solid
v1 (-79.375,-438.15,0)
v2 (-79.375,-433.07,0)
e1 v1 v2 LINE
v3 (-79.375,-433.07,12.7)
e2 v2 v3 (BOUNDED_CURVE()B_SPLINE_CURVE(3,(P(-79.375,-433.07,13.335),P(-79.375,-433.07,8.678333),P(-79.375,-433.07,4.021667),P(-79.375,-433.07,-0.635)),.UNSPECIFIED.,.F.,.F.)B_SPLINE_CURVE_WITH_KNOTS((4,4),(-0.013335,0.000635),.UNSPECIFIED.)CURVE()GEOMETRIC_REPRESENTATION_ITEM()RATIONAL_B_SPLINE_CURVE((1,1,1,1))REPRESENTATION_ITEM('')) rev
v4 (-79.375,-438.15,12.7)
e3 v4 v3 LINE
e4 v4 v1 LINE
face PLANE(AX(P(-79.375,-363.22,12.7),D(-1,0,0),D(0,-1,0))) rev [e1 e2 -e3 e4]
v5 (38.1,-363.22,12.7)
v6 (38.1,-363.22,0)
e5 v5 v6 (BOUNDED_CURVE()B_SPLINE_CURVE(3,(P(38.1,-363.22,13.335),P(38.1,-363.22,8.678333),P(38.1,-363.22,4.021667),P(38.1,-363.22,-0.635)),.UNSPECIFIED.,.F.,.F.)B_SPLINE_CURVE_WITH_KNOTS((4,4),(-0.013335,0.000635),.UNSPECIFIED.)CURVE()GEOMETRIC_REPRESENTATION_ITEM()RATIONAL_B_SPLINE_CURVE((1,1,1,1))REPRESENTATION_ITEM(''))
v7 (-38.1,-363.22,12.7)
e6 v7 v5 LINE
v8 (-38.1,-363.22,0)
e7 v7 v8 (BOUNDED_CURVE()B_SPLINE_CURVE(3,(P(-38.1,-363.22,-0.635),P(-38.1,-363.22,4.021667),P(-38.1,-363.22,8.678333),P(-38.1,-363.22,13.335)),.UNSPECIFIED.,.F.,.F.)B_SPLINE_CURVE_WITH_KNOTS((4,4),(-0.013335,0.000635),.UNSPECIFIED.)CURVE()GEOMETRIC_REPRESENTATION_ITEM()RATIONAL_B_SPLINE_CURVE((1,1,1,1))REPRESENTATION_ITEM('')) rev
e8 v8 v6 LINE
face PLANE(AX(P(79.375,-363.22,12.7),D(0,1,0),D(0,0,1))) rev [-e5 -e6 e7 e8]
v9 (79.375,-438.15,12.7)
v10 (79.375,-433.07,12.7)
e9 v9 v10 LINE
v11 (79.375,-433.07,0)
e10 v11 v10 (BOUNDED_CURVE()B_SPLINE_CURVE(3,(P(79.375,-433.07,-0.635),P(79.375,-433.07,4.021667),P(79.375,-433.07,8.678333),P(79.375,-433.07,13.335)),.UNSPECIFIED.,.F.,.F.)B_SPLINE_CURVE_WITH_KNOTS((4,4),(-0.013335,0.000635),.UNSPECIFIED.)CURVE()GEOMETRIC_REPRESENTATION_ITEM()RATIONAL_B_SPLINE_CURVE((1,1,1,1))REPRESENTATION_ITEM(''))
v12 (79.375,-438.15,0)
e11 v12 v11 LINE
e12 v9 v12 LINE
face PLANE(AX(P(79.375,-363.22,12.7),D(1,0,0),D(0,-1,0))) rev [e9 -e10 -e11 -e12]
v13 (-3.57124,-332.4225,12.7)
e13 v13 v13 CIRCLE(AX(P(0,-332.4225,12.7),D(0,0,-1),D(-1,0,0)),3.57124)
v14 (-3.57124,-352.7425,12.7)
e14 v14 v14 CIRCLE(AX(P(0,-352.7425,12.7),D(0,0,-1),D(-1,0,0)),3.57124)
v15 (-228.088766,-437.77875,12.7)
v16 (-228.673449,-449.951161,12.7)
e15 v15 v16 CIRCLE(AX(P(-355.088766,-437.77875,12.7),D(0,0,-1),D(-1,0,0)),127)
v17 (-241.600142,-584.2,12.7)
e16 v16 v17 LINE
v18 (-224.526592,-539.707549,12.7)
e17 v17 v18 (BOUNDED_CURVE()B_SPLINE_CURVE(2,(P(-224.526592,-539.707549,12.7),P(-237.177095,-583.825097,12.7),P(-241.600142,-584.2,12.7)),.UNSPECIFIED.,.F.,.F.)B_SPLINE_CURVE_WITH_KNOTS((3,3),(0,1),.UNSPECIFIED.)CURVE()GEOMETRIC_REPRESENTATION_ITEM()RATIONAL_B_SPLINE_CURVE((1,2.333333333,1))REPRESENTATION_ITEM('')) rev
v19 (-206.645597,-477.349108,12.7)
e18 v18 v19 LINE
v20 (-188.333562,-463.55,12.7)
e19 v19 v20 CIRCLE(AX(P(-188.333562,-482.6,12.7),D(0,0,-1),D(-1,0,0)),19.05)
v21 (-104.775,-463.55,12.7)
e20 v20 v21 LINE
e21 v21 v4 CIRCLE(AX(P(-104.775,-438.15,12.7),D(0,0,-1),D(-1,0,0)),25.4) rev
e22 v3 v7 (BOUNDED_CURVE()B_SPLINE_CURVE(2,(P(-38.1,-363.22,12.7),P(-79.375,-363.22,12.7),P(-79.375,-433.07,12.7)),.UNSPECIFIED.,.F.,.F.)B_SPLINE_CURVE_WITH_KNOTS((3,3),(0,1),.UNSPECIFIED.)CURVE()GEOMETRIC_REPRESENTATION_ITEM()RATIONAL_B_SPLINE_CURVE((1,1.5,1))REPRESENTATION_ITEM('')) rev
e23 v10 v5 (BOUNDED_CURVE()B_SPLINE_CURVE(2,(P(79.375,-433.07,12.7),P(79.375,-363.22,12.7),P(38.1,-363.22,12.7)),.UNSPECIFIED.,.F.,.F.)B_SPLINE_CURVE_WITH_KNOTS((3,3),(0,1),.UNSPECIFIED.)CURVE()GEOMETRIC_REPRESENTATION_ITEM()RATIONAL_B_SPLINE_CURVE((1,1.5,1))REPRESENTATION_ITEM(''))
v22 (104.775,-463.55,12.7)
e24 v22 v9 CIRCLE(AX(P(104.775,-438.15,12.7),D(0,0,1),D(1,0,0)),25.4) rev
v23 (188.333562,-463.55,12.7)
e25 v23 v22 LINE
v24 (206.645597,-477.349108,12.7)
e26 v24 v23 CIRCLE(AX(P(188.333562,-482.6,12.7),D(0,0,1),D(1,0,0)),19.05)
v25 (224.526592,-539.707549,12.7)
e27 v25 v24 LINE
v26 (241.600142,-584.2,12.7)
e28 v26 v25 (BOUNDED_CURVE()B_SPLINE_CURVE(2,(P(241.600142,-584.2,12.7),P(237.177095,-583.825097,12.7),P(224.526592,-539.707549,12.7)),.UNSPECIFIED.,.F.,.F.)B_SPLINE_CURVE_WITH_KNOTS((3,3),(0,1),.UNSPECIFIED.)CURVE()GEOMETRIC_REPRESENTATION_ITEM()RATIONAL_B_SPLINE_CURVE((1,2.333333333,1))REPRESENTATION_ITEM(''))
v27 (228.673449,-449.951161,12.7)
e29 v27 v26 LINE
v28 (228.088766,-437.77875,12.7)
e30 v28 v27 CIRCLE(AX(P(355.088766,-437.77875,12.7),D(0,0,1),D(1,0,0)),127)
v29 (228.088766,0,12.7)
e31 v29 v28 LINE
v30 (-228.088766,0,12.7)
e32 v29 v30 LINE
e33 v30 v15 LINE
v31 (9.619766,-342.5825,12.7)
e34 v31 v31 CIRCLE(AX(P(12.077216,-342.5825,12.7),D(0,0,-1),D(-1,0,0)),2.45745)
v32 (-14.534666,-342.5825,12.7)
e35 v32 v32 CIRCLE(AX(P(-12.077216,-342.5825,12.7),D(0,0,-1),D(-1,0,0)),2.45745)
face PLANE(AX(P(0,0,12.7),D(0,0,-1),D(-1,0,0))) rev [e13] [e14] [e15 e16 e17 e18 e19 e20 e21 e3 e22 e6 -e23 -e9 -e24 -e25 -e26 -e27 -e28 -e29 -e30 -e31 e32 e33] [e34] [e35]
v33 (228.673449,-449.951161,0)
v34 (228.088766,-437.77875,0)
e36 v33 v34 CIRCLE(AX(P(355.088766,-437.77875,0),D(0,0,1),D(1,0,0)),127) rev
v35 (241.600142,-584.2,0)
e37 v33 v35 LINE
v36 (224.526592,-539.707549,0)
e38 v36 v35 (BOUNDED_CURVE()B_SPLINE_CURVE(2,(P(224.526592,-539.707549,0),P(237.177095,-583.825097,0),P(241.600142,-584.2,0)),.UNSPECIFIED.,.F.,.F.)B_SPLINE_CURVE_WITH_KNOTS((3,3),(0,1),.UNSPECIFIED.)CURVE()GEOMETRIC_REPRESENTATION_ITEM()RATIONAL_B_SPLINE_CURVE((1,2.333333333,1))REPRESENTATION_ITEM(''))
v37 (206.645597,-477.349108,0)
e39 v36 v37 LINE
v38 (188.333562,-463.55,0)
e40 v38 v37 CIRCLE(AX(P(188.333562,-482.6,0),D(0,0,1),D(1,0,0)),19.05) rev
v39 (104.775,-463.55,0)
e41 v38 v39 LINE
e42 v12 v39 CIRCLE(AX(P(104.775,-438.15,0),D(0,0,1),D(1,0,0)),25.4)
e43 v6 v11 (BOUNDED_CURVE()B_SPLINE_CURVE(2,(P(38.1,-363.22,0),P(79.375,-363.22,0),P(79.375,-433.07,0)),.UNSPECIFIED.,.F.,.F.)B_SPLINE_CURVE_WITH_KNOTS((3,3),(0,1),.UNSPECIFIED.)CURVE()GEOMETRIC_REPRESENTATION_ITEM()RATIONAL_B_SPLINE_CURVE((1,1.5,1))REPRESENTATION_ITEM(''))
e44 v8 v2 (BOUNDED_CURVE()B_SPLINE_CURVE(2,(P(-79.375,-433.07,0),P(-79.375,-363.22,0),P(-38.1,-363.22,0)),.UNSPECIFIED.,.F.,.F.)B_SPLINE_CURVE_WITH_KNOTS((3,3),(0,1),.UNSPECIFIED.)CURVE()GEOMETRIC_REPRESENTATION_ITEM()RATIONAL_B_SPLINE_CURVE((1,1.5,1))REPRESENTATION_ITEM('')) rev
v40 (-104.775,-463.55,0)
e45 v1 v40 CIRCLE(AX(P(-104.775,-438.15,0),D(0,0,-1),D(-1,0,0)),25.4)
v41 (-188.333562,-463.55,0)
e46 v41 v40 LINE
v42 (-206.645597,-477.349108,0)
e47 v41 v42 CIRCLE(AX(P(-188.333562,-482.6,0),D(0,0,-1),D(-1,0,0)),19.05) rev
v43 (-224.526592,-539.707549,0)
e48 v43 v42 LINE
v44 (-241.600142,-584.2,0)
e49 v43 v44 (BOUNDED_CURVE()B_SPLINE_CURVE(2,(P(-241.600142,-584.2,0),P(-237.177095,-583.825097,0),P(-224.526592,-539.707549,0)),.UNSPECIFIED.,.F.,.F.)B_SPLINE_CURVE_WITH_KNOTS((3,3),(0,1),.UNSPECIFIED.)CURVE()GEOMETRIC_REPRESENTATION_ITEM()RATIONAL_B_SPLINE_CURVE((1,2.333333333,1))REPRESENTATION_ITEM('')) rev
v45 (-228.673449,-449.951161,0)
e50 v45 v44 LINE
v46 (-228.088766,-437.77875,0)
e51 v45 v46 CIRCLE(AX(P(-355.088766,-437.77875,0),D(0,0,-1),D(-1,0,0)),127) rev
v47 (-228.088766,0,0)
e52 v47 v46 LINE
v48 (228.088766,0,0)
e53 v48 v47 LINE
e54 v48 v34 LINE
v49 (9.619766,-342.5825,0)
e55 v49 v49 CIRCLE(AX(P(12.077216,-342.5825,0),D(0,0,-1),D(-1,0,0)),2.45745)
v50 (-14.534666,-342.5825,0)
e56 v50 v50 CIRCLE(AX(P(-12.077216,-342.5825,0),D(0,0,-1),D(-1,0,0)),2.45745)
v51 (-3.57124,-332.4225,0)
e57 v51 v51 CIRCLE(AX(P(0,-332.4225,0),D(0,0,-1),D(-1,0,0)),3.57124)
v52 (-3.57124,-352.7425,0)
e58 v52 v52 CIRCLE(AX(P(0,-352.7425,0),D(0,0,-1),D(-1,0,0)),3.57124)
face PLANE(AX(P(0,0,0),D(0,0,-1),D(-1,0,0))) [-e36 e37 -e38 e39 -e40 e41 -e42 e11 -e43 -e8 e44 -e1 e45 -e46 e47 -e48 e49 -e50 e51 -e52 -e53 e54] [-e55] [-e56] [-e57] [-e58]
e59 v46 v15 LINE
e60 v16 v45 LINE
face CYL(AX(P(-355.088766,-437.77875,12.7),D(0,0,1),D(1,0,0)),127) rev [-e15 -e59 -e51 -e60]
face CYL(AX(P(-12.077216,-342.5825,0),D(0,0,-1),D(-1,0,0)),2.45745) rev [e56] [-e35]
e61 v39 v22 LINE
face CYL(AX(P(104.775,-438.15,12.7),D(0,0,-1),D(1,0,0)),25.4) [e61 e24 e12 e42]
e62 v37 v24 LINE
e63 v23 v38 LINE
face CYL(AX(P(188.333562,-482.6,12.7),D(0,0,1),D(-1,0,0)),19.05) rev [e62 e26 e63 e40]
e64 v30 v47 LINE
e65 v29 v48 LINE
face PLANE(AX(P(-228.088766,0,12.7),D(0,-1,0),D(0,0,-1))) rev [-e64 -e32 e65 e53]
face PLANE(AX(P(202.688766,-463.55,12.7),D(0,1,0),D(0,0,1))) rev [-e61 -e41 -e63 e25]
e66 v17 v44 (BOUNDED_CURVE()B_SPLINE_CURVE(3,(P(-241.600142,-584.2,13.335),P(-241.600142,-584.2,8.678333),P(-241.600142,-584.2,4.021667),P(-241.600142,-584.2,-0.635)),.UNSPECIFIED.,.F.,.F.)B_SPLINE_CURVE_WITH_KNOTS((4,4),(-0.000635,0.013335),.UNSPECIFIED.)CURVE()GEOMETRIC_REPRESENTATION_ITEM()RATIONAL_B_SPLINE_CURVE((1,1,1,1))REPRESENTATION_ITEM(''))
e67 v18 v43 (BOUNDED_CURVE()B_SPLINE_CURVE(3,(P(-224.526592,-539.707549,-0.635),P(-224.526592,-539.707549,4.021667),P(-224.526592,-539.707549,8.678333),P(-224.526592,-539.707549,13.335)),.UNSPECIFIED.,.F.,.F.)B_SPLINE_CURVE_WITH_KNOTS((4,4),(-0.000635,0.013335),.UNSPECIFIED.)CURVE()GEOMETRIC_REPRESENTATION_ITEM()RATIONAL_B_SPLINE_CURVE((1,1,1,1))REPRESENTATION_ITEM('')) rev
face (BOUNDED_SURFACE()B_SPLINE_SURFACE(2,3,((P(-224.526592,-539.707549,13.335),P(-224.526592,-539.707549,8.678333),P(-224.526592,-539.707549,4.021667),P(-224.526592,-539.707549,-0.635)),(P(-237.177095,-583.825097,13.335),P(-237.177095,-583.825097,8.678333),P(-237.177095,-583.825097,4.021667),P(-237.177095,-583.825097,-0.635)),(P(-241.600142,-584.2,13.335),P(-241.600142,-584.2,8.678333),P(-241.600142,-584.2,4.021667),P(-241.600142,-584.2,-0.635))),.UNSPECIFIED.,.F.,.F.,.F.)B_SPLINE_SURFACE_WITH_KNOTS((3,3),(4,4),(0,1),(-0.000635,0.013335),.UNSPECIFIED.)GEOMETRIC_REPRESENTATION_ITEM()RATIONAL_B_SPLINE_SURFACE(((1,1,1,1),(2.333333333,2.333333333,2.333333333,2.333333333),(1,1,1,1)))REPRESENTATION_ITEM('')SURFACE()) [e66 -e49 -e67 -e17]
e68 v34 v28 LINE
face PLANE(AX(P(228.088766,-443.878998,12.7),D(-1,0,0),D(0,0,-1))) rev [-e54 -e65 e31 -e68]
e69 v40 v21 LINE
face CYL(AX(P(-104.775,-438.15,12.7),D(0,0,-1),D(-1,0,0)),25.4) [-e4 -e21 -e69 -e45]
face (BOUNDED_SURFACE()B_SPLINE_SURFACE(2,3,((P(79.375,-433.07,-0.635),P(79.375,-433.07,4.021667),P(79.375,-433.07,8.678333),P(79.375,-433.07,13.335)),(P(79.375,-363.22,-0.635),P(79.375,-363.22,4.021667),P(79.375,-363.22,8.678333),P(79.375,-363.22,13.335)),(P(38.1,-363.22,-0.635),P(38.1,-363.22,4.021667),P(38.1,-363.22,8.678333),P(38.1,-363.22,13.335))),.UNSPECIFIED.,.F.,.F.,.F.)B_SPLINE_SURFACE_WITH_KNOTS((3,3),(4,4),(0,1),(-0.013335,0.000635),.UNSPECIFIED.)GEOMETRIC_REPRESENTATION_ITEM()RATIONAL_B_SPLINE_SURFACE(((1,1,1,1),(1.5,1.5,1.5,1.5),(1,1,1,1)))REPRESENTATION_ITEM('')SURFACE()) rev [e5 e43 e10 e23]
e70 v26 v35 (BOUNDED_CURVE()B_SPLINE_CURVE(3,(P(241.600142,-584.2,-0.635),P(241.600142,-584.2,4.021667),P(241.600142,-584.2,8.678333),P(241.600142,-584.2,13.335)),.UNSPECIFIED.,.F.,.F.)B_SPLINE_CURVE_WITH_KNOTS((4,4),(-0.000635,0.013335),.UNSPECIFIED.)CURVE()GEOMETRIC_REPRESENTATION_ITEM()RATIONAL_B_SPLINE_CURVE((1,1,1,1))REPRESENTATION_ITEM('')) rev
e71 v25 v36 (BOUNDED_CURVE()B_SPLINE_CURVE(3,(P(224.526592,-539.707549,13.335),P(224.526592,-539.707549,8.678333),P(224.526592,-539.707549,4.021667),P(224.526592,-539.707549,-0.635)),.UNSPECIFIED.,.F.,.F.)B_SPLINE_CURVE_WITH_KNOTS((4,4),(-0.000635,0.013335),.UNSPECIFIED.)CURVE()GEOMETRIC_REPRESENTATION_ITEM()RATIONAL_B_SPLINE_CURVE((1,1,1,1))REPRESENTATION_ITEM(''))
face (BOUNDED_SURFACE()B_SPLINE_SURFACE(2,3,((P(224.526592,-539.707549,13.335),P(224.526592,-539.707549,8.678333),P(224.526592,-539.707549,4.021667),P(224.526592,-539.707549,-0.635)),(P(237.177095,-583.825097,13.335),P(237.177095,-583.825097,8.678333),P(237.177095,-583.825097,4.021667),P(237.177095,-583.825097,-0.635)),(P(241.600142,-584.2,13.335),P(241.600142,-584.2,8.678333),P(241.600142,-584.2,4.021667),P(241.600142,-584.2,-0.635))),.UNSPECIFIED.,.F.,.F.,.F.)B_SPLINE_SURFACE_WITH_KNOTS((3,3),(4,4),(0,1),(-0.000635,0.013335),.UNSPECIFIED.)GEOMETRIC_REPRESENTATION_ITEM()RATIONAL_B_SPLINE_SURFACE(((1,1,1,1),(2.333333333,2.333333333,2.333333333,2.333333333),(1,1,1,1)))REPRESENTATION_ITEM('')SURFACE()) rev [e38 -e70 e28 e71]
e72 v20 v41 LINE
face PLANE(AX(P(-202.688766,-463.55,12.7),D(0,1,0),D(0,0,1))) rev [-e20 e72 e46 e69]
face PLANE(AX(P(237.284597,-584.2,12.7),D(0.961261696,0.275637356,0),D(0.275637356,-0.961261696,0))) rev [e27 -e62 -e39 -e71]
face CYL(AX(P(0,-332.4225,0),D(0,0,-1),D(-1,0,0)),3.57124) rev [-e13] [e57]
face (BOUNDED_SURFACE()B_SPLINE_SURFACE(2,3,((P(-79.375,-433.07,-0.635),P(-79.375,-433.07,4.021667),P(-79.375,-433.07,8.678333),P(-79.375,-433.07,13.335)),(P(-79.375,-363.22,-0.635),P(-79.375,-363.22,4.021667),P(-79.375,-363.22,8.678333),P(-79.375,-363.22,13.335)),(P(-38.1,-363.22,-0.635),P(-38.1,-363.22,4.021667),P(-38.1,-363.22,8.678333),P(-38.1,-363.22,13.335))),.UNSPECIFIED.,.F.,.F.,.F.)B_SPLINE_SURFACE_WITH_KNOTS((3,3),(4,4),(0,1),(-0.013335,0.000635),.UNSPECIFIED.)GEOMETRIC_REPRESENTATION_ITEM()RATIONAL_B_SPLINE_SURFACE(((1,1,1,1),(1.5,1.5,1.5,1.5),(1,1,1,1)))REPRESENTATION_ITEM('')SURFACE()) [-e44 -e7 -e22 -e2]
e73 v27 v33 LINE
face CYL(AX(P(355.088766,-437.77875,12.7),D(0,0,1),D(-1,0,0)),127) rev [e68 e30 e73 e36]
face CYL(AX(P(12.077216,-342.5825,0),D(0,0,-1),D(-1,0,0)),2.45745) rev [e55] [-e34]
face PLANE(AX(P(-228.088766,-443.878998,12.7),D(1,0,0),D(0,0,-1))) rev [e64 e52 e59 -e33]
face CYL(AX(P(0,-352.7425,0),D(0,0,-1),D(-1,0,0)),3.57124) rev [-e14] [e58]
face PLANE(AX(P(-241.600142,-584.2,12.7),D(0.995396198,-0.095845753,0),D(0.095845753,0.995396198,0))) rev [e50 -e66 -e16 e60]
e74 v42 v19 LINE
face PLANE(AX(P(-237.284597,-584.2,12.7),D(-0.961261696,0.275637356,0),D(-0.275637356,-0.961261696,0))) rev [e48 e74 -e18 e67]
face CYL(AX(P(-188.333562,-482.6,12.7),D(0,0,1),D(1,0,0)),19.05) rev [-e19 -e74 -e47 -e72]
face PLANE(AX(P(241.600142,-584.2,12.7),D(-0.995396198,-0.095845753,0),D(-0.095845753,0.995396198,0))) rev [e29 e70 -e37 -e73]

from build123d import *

# Parameters (mm, degrees)
BOSS_EXTRUDE1_DEPTH     = 12.7
FILLET2_SIZE            = 41.275
FILLET2_SIZE_2          = 69.85
FILLET3_R               = 25.4
FILLET4_R               = 19.05
FILLET5_START           = -1
FILLET5_DEPTH           = 15
FILLET6_R               = 127
CUT_EXTRUDE1_REACH      = 634.314
SKETCH3_W               = 241.600142069
SKETCH3_H               = 584.2
F_8_CLEARANCE_HOLE1_D   = 4.9149
F_1_4_CLEARANCE_HOLE1_D = 7.14248


with BuildPart() as part:
    # Sketch1 → Boss-Extrude1 (new body)
    with BuildSketch(Plane.XY):
        Polygon((-228.088766336, 0), (228.088766336, 0), (228.088766336, -443.878997916), (241.600142069, -584.2), (237.284597128, -584.2), (202.688766336, -463.55), (79.375, -463.55), (79.375, -363.22), (-79.375, -363.22), (-79.375, -463.55), (-202.688766336, -463.55), (-237.284597128, -584.2), (-241.600142069, -584.2), (-228.088766336, -443.878997916), align=None)
    extrude(amount=BOSS_EXTRUDE1_DEPTH)

    # Fillet2
    # a fillet whose section is not a circle: 69.85, 41.275 mm, written as the material it adds along each edge
    with BuildSketch(Plane(origin=(-79.375, -363.22, 0), x_dir=(1, 0, 0), z_dir=(0, 0, 1))) as fillet2_piece_1:
        with BuildLine():
            Bezier((FILLET2_SIZE, 0), (0, 0), (0, -FILLET2_SIZE_2), weights=[1, 1.5, 1])
            Line((0, -FILLET2_SIZE_2), (0, 0))
            Line((0, 0), (FILLET2_SIZE, 0))
        make_face()
    extrude(amount=12.7)

    # Fillet3
    fillet3_edges = [part.edges().sort_by_distance(p)[0] for p in [
        (-79.375, -463.55, 6.35),
    ]]
    fillet(fillet3_edges, radius=FILLET3_R)

    # Fillet4
    fillet4_edges = [part.edges().sort_by_distance(p)[0] for p in [
        (-202.688766336, -463.55, 6.35),
    ]]
    fillet(fillet4_edges, radius=FILLET4_R)

    # Fillet5: read off the stored shape, not the designer's step
    # Fillet5 outline → Fillet5 (cut)
    with BuildSketch(Plane.XY.offset(FILLET5_START)):
        with BuildLine():
            Line((-237.284597128, -584.2), (-224.526592015, -539.707548693))
            add(Edge.make_bspline(
                [(-224.526592015, -539.707548693), (-237.177095318, -583.825096633), (-241.600142069, -584.2)],
                knots=[0, 0, 0, 1, 1, 1], degree=2, weights=[1, 2.333333333, 1]))
            Line((-241.600142069, -584.2), (-237.284597128, -584.2))
        make_face()
    extrude(amount=FILLET5_DEPTH, mode=Mode.SUBTRACT)

    # Fillet6
    # the kernel refuses this fillet: 127 mm, written as the material it adds along each edge
    with BuildSketch(Plane(origin=(-228.088766336, -443.878997916, 0), x_dir=(0, 1, 0), z_dir=(0, 0, 1))) as fillet6_piece_1:
        with BuildLine():
            CenterArc((FILLET6_R * 0.0480334444852, FILLET6_R), FILLET6_R, 264.5, 5.5)
            Line((-FILLET6_R * 0.047812308035, FILLET6_R * 0.00460380163282), (0, 0))
            Line((0, 0), (FILLET6_R * 0.0480334444852, 0))
        make_face()
    extrude(amount=12.7)

    # Sketch3 → Cut-Extrude1 (cut, up to next)
    with BuildSketch(Plane.XY.offset(12.7), mode=Mode.PRIVATE) as cut_extrude1_sk1:
        with Locations((120.800071035, -292.1)):
            Rectangle(SKETCH3_W, SKETCH3_H)
    cut_extrude1_tool1 = extrude(cut_extrude1_sk1.sketch, amount=-CUT_EXTRUDE1_REACH, mode=Mode.PRIVATE) & part.part
    add(cut_extrude1_tool1.solids().sort_by_distance((120.800071, -292.1, 12.7))[0], mode=Mode.SUBTRACT)

    # Mirror5: part across plane


with BuildPart() as part_1:
    add(part.part)
    add(part.part.mirror(Plane(origin=(0, 0, -0.35025), x_dir=(0, 0, 1), z_dir=(-1, 0, 0))))

    # #8 Clearance Hole1 (through all)
    with Locations(Plane(origin=(0, 0, 0), x_dir=(-1, 0, 0), z_dir=(0, 0, -1))):
        with Locations((12.077216058, -342.5825), (-12.077216058, -342.5825)):
            Hole(F_8_CLEARANCE_HOLE1_D / 2)

    # 1/4 Clearance Hole1 (through all)
    with Locations(Plane(origin=(0, 0, 0), x_dir=(-1, 0, 0), z_dir=(0, 0, -1))):
        with Locations((0, -352.7425), (0, -332.4225)):
            Hole(F_1_4_CLEARANCE_HOLE1_D / 2)


solid = part_1.part
